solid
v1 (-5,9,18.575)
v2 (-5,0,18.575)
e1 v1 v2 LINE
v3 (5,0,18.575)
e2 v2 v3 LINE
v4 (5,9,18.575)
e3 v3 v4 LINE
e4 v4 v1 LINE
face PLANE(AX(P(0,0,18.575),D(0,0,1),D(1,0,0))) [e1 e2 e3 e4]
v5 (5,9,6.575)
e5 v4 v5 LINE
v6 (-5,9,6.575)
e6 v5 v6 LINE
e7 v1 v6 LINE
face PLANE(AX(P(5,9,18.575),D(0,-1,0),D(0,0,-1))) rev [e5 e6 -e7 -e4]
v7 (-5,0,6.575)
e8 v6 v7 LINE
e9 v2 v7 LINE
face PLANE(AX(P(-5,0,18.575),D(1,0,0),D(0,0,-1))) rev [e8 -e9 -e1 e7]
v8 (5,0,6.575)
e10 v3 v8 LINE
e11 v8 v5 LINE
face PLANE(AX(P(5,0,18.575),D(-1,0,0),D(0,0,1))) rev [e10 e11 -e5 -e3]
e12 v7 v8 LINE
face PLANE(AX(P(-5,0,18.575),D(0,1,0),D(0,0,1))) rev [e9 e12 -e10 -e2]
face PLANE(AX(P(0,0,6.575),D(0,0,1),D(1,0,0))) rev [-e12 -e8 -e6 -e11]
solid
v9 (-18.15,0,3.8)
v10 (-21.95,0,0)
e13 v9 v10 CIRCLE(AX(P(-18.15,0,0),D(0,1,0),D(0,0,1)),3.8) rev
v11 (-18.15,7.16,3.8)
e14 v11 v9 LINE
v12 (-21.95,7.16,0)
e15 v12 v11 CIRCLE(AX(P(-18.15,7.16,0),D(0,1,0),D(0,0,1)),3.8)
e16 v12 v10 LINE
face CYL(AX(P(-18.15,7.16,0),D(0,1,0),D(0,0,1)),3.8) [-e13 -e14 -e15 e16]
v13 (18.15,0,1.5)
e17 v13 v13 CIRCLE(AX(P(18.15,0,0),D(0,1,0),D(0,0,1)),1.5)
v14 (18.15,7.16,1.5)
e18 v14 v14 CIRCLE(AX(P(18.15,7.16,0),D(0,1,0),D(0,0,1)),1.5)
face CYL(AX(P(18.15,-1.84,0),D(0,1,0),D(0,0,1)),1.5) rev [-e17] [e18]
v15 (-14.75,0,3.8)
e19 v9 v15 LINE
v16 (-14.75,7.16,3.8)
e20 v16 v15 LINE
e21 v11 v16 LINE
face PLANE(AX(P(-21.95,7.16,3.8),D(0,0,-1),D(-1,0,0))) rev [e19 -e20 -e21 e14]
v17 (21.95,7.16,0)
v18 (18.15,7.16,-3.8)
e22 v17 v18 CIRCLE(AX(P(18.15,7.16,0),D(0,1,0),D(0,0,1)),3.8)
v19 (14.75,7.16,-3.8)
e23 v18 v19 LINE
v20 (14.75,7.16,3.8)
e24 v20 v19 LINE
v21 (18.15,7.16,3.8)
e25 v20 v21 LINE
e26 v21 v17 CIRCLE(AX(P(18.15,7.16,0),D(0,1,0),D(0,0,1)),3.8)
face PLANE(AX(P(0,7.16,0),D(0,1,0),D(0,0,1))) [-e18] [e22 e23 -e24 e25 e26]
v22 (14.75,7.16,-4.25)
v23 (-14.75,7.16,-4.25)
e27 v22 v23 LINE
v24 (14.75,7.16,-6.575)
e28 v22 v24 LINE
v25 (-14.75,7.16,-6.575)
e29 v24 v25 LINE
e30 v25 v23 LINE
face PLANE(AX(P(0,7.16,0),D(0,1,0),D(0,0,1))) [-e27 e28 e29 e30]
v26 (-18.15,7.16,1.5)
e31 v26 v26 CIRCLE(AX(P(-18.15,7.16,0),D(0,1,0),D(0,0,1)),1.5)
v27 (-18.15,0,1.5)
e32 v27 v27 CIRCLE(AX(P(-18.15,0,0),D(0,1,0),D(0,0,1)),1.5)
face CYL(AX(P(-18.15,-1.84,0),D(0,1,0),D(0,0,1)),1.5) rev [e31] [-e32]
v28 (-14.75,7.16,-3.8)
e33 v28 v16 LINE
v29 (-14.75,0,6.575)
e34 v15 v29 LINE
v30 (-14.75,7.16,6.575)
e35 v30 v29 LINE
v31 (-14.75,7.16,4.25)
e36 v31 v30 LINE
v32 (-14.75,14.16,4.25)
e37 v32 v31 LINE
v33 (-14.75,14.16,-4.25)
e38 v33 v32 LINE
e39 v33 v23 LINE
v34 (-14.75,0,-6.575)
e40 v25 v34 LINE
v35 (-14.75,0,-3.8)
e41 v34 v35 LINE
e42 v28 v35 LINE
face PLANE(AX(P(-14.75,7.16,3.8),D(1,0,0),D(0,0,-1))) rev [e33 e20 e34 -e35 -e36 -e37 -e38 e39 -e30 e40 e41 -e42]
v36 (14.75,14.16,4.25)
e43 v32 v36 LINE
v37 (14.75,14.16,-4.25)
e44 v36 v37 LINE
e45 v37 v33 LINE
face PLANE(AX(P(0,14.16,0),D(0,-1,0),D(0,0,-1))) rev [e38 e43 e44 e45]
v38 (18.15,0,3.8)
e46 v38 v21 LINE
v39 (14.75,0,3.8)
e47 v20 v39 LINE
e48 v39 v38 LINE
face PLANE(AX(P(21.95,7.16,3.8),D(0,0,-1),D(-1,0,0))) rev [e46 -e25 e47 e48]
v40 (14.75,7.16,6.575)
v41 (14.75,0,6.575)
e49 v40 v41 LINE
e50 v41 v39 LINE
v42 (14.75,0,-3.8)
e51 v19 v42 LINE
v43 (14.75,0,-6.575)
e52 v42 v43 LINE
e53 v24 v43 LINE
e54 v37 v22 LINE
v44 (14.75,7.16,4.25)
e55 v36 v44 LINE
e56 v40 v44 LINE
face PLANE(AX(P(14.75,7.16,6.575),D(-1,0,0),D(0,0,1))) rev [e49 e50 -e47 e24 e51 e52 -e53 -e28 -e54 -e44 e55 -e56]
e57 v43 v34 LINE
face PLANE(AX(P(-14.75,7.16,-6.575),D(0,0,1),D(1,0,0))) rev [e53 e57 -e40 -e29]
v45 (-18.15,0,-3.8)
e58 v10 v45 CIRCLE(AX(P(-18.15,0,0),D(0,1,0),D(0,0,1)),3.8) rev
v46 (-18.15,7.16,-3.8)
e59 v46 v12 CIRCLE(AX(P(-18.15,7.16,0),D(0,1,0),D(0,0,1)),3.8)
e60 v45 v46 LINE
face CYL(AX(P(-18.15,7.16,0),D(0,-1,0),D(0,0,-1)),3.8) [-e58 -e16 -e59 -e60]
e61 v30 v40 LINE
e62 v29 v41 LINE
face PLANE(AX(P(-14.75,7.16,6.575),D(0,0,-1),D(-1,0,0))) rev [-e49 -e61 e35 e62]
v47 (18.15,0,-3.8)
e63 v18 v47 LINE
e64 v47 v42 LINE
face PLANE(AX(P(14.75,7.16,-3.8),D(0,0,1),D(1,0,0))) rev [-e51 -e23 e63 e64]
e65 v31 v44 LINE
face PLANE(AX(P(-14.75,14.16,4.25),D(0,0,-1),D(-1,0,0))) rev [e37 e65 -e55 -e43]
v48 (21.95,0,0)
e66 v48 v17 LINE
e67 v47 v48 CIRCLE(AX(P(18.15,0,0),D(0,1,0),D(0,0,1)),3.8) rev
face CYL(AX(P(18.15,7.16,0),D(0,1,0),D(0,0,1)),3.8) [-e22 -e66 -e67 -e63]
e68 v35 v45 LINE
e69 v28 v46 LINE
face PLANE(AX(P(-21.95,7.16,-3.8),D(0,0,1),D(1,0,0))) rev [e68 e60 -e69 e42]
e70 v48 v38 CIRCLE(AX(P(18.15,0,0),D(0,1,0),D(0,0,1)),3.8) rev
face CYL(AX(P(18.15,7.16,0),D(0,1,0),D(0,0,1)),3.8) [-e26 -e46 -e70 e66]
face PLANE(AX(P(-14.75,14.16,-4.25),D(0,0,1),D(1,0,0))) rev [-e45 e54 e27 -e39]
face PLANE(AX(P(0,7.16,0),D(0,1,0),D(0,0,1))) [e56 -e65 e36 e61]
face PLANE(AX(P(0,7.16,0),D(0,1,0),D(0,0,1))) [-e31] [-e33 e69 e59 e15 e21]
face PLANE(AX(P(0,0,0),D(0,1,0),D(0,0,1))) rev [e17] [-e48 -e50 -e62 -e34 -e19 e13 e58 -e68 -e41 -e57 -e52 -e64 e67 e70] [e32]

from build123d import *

# Parameters (mm, degrees)
BOSS_EXTRUDE1_DEPTH = 7.16
FILLET2_R           = 3.8
FILLET3_R           = 3.8
FILLET4_R           = 3.8
FILLET5_R           = 3.8
SKETCH2_W           = 29.5
SKETCH2_H           = 8.5
BOSS_EXTRUDE2_DEPTH = 7
SKETCH3_W           = 10
SKETCH3_H           = 9
BOSS_EXTRUDE4_DEPTH = 12
SKETCH4_R           = 1.5
CUT_EXTRUDE1_DEPTH  = 9


with BuildPart() as part:
    # Sketch1 → Boss-Extrude1 (new body)
    with BuildSketch(Plane(origin=(0, 0, 0), x_dir=(1, 0, 0), z_dir=(0, 1, 0))):
        Polygon((21.95, -3.8), (14.75, -3.8), (14.75, -6.575), (-14.75, -6.575), (-14.75, -3.8), (-21.95, -3.8), (-21.95, 3.8), (-14.75, 3.8), (-14.75, 6.575), (14.75, 6.575), (14.75, 3.8), (21.95, 3.8), align=None)
    extrude(amount=BOSS_EXTRUDE1_DEPTH)

    # Fillet2
    fillet2_edges = [part.edges().sort_by_distance(p)[0] for p in [
        (-21.95, 3.58, -3.8),
    ]]
    fillet(fillet2_edges, radius=FILLET2_R)

    # Fillet3
    fillet3_edges = [part.edges().sort_by_distance(p)[0] for p in [
        (-21.95, 3.58, 3.8),
    ]]
    fillet(fillet3_edges, radius=FILLET3_R - 0.0001)  # a hair under: the kernel refuses the full size

    # Fillet4
    fillet4_edges = [part.edges().sort_by_distance(p)[0] for p in [
        (21.95, 3.58, -3.8),
    ]]
    fillet(fillet4_edges, radius=FILLET4_R)

    # Fillet5
    fillet5_edges = [part.edges().sort_by_distance(p)[0] for p in [
        (21.95, 3.58, 3.8),
    ]]
    fillet(fillet5_edges, radius=FILLET5_R - 0.0001)  # a hair under: the kernel refuses the full size

    # Sketch2 → Boss-Extrude2 (add)
    with BuildSketch(Plane(origin=(0, 7.16, 0), x_dir=(1, 0, 0), z_dir=(0, 1, 0))):
        Rectangle(SKETCH2_W, SKETCH2_H)
    extrude(amount=BOSS_EXTRUDE2_DEPTH)

    # Sketch4 → Cut-Extrude1 (cut)
    with BuildSketch(Plane(origin=(0, 7.16, 0), x_dir=(1, 0, 0), z_dir=(0, 1, 0))):
        with Locations(Location((-18.15, 0, 0), (0, 0, 270))):
            Circle(SKETCH4_R)
        with Locations(Location((18.15, 0, 0), (0, 0, 270))):
            Circle(SKETCH4_R)
    extrude(amount=-CUT_EXTRUDE1_DEPTH, mode=Mode.SUBTRACT)


with BuildPart() as body_2:
    # Sketch3 → Boss-Extrude4 (new body)
    with BuildSketch(Plane.XY.offset(6.575)):
        with Locations((0, 4.5)):
            Rectangle(SKETCH3_W, SKETCH3_H)
    extrude(amount=BOSS_EXTRUDE4_DEPTH)


solid = Compound([part.part, body_2.part])
